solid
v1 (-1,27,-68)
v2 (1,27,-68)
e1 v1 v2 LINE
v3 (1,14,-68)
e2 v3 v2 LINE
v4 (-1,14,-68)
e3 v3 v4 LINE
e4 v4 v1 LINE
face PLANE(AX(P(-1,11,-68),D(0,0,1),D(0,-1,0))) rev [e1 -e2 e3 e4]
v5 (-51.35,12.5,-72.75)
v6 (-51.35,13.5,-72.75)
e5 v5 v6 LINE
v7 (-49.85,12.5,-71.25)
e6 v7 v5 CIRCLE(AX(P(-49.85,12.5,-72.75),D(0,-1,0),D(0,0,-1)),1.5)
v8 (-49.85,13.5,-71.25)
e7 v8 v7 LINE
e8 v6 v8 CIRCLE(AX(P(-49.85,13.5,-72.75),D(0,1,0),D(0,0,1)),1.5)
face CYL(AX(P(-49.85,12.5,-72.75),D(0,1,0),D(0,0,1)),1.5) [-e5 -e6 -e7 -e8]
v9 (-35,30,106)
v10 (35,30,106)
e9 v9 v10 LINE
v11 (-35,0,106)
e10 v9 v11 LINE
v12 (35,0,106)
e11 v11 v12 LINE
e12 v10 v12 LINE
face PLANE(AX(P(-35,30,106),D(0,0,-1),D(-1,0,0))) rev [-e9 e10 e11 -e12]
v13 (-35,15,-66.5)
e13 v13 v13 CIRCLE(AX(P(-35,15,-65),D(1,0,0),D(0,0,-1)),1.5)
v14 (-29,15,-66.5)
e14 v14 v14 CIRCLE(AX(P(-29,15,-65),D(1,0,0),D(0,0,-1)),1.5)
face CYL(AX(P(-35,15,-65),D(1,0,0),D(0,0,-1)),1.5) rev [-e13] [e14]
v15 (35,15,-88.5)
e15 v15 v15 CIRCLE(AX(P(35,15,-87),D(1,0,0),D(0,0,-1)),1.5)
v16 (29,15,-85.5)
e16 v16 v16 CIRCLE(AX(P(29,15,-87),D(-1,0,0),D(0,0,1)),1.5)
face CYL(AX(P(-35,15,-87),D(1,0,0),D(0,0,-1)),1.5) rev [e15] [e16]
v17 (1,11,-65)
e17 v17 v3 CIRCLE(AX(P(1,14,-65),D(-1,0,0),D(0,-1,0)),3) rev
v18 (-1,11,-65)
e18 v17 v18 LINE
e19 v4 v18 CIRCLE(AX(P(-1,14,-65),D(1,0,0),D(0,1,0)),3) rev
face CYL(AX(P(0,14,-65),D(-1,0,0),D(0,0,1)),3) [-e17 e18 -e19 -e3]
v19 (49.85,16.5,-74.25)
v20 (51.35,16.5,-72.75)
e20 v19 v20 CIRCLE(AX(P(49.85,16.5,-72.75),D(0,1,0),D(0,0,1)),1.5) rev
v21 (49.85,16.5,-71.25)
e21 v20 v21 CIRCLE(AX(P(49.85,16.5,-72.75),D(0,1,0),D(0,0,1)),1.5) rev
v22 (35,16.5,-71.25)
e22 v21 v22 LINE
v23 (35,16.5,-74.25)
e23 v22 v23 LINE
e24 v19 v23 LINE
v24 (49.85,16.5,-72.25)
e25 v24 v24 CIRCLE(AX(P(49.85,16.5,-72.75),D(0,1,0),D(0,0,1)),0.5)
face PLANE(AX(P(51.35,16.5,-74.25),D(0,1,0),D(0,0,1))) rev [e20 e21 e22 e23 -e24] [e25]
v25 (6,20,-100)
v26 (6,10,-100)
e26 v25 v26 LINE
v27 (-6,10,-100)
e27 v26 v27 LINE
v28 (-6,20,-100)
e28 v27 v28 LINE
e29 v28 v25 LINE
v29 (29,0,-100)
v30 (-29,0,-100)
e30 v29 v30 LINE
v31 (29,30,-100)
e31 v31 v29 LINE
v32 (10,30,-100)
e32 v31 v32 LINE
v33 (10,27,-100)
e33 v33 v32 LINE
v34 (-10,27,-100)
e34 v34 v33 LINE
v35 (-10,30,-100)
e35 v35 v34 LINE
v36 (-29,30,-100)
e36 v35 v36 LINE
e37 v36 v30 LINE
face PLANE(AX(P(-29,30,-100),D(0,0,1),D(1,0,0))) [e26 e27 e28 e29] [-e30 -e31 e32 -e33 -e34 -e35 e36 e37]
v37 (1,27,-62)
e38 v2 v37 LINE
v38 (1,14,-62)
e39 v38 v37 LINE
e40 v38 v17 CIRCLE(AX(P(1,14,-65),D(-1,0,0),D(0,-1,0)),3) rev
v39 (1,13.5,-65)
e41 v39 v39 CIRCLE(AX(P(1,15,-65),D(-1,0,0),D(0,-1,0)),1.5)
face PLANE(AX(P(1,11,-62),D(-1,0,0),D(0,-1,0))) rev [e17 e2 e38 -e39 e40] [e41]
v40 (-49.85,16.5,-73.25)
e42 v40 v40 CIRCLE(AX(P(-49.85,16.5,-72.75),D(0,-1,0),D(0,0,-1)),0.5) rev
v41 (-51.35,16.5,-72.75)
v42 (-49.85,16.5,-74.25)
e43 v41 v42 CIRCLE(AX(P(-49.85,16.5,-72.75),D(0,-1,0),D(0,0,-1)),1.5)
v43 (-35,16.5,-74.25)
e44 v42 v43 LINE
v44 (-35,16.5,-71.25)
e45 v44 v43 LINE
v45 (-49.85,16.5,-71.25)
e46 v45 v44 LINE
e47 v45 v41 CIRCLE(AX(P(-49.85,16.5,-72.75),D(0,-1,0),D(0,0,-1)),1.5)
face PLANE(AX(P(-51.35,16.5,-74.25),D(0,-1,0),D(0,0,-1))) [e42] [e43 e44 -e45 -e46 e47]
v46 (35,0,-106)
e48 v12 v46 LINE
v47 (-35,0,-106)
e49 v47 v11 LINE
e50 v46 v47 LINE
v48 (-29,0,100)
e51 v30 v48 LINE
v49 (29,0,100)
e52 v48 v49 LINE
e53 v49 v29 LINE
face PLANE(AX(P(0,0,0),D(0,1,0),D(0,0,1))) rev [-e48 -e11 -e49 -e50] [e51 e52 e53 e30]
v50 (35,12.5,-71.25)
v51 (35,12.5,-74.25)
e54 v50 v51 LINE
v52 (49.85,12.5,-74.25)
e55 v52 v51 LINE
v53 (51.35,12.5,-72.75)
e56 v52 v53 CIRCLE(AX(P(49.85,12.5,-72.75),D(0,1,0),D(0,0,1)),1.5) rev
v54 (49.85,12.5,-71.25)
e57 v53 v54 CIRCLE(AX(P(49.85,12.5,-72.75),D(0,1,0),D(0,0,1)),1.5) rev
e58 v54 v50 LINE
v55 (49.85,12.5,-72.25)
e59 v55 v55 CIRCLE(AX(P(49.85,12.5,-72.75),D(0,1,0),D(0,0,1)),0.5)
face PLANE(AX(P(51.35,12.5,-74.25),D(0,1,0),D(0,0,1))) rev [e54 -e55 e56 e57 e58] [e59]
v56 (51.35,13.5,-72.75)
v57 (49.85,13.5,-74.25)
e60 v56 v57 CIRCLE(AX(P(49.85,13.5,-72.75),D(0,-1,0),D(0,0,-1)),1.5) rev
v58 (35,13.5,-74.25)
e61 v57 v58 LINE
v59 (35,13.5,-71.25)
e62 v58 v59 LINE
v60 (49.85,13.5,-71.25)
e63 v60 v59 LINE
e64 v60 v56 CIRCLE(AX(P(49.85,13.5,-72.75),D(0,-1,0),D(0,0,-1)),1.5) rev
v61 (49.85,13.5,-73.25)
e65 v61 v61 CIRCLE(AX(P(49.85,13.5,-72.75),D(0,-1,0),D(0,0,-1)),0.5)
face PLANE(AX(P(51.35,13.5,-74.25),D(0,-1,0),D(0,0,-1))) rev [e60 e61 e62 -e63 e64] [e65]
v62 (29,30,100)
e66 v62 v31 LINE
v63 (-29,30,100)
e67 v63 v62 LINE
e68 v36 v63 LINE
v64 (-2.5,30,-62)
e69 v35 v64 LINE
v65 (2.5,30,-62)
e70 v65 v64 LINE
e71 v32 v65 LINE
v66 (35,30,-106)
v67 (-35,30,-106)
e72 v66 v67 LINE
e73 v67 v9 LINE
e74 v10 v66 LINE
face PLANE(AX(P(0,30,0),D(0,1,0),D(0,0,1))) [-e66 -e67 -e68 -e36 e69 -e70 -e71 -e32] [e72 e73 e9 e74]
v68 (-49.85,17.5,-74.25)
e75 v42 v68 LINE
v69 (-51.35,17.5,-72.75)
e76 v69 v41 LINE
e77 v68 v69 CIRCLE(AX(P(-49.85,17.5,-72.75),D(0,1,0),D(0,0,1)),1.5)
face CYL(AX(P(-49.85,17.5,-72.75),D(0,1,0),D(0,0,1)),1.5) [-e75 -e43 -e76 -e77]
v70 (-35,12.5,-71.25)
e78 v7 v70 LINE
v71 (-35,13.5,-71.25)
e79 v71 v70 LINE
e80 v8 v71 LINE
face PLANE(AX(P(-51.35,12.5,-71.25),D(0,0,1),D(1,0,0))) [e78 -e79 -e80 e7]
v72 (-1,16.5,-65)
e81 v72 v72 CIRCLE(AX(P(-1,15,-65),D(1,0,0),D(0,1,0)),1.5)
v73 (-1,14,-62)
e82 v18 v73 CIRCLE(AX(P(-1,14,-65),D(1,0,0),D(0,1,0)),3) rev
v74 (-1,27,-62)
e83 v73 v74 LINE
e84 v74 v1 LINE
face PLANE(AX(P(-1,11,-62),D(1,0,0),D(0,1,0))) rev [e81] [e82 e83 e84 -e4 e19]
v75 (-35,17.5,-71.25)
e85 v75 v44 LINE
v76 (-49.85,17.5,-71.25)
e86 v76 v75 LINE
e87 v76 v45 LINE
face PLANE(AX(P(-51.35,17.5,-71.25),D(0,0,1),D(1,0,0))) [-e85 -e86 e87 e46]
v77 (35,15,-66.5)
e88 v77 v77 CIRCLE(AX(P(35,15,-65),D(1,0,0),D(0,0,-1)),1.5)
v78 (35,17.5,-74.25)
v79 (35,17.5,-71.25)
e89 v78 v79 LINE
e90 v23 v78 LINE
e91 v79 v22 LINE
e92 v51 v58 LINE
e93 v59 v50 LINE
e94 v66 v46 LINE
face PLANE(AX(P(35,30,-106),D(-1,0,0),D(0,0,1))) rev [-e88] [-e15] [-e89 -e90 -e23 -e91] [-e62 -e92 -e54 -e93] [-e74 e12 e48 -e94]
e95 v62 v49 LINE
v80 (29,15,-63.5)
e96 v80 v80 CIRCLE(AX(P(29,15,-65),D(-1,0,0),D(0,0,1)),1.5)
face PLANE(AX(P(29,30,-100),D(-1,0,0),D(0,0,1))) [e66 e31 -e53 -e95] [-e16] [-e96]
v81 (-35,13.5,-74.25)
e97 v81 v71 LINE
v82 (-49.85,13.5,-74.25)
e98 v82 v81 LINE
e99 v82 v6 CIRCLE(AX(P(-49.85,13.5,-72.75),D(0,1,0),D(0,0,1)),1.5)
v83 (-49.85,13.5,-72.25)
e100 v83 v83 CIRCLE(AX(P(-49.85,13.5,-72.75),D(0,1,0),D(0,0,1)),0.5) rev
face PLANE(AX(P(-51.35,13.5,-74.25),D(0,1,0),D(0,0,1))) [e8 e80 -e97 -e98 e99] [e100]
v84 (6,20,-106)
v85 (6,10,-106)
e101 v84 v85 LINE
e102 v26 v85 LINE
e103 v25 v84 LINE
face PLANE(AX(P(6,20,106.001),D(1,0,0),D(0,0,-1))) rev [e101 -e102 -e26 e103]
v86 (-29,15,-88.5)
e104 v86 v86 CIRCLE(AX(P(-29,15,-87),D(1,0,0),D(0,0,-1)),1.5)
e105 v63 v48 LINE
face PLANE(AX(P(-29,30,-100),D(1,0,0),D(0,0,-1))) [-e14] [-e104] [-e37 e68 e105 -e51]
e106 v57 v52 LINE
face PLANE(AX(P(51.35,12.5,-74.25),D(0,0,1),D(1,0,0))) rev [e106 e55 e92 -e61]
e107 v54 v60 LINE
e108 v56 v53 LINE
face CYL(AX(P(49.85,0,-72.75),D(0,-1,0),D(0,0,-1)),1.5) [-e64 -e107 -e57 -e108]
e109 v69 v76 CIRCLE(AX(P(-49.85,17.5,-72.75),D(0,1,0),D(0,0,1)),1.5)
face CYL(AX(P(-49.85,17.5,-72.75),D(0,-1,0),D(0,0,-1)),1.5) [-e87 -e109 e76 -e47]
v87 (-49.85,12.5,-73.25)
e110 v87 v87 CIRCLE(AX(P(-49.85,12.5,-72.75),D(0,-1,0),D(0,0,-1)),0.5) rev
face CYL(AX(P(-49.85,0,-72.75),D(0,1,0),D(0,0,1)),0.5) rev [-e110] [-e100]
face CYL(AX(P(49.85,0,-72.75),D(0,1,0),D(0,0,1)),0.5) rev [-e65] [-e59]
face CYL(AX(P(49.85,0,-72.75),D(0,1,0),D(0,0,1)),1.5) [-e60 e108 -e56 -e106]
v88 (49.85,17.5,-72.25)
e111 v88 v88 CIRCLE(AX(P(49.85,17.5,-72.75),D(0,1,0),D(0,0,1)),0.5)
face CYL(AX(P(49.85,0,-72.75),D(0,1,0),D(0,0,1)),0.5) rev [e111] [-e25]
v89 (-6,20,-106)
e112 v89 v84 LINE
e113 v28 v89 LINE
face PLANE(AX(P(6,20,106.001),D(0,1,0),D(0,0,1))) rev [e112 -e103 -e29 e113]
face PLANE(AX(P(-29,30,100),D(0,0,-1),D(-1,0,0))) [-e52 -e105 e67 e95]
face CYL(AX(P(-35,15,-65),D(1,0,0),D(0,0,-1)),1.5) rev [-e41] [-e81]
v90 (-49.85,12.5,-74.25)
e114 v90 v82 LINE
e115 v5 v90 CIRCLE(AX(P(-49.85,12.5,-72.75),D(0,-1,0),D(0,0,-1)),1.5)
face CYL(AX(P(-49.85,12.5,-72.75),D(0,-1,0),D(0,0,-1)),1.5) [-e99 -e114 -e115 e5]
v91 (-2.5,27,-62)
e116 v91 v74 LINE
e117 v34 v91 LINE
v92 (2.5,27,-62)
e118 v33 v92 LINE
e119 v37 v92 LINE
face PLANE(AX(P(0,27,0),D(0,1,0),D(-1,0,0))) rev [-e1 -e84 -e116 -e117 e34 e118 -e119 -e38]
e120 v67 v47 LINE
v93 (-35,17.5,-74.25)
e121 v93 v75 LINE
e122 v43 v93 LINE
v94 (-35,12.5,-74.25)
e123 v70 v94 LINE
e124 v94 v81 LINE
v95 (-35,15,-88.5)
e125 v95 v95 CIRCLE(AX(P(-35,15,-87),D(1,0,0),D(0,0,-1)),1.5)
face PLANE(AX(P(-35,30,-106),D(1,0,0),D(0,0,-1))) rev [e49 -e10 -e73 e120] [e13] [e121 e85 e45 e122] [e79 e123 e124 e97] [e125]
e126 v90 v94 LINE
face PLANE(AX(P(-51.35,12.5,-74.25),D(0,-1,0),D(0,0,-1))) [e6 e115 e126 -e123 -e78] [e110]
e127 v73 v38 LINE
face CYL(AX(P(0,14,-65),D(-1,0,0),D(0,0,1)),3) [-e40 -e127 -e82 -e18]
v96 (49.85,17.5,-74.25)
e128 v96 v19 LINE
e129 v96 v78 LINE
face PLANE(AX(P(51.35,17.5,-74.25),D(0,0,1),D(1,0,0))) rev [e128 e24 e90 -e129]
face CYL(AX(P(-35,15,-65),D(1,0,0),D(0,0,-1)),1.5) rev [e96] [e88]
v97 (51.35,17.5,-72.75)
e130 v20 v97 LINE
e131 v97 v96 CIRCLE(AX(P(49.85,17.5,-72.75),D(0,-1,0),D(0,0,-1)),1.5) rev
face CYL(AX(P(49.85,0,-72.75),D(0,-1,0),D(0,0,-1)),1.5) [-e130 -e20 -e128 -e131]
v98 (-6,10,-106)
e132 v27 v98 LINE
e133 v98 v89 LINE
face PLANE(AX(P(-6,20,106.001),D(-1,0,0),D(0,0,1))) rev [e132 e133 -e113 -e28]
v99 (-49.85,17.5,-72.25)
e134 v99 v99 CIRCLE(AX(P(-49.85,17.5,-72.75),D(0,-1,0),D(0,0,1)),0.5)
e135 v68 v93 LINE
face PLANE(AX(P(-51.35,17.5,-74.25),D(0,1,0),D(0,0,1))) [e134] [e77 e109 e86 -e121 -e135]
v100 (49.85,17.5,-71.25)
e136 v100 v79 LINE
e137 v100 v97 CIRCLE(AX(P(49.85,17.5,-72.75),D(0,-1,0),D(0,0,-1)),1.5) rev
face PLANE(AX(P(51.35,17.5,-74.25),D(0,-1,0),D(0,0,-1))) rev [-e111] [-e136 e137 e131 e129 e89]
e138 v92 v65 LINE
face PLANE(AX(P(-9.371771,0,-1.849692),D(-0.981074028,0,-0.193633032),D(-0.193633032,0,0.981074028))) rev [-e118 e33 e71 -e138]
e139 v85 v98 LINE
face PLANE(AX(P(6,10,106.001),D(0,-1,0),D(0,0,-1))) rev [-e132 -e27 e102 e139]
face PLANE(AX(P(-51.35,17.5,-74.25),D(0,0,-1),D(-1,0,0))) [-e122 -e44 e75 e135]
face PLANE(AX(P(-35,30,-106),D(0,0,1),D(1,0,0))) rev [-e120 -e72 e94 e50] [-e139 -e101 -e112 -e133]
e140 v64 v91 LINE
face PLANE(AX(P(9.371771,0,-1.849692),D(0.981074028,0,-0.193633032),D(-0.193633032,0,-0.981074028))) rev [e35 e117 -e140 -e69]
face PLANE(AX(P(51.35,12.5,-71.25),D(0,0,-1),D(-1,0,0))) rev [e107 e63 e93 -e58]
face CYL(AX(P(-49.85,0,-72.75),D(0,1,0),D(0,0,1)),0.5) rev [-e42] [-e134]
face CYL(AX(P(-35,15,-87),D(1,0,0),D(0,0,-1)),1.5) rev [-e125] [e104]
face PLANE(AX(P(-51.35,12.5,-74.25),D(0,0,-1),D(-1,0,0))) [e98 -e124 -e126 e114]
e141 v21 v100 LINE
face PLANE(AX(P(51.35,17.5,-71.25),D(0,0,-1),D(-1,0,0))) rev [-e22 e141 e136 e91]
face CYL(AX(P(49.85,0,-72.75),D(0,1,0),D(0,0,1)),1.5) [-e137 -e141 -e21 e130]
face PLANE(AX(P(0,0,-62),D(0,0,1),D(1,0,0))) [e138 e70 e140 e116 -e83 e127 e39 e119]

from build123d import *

# Parameters (mm, degrees)
SKETCH1_W            = 70
SKETCH1_H            = 212
SKETCH1_W_2          = 58
SKETCH1_H_2          = 200
BOSS_EXTRUDE1_DEPTH  = 30
SKETCH10_W           = 2
SKETCH10_H           = 6
BOSS_EXTRUDE3_DEPTH  = 16
FILLET2_R            = 3
SKETCH2_R            = 1.5
CUT_EXTRUDE1_DEPTH   = 131.52202895
CUT_EXTRUDE2_REACH   = 218.954
SKETCH3_W            = 12
SKETCH3_H            = 10
SKETCH4_W            = 3
SKETCH4_H            = 1
BOSS_EXTRUDE2_DEPTH  = 16.35
FILLET1_R            = 1.5
SKETCH6_R            = 0.5
CUT_EXTRUDE4_DEPTH   = 120.075910751
FILLET1_OF_MIRROR2_R = 1.5


with BuildPart() as part:
    # Sketch1 → Boss-Extrude1 (new body)
    with BuildSketch(Plane(origin=(0, 0, 0), x_dir=(1, 0, 0), z_dir=(0, 1, 0))):
        Rectangle(SKETCH1_W, SKETCH1_H)
        Rectangle(SKETCH1_W_2, SKETCH1_H_2, mode=Mode.SUBTRACT)
    extrude(amount=BOSS_EXTRUDE1_DEPTH)

    # Sketch7 → Loft3 section 0
    with BuildSketch(Plane.XY.offset(-100)):
        with BuildLine():
            Line((-10, 30), (10, 30))
            Line((10, 30), (10, 27))
            Line((10, 27), (-10, 27))
            Line((-10, 27), (-10, 30))
        make_face()
    # Sketch8 → Loft3 section 1
    with BuildSketch(Plane.XY.offset(-62)):
        with BuildLine():
            Line((-2.5, 30), (2.5, 30))
            Line((2.5, 30), (2.5, 27))
            Line((2.5, 27), (-2.5, 27))
            Line((-2.5, 27), (-2.5, 30))
        make_face()
    loft()

    # Sketch10 → Boss-Extrude3 (add)
    with BuildSketch(Plane.XZ.offset(-27)):
        with Locations((0, -65)):
            Rectangle(SKETCH10_W, SKETCH10_H)
    extrude(amount=BOSS_EXTRUDE3_DEPTH)

    # Fillet2
    fillet2_edges = [part.edges().sort_by_distance(p)[0] for p in [
        (0, 11, -68),
        (0, 11, -62),
    ]]
    fillet(fillet2_edges, radius=FILLET2_R - 0.0001)  # a hair under: the kernel refuses the full size

    # Sketch2 → Cut-Extrude1 (cut, through all)
    with BuildSketch(Plane(origin=(35, 0, 0), x_dir=(0, 0, -1), z_dir=(1, 0, 0))):
        with Locations(Location((65, 15, 0), (0, 0, 270))):
            Circle(SKETCH2_R)
        with Locations((87, 15)):
            Circle(SKETCH2_R)
    extrude(amount=-CUT_EXTRUDE1_DEPTH, mode=Mode.SUBTRACT)

    # Sketch3 → Cut-Extrude2 (cut, up to next)
    with BuildSketch(Plane(origin=(0, 0, -106), x_dir=(-1, 0, 0), z_dir=(0, 0, -1)), mode=Mode.PRIVATE) as cut_extrude2_sk1:
        with Locations((0, 15)):
            Rectangle(SKETCH3_W, SKETCH3_H)
    cut_extrude2_tool1 = extrude(cut_extrude2_sk1.sketch, amount=-CUT_EXTRUDE2_REACH, mode=Mode.PRIVATE) & part.part
    add(cut_extrude2_tool1.solids().sort_by_distance((0, 15, -106))[0], mode=Mode.SUBTRACT)

    # Sketch4 → Boss-Extrude2 (add)
    with BuildSketch(Plane(origin=(35, 0, 0), x_dir=(0, 0, -1), z_dir=(1, 0, 0))):
        with Locations((72.75, 13)):
            Rectangle(SKETCH4_W, SKETCH4_H)
        with Locations((72.75, 17)):
            Rectangle(SKETCH4_W, SKETCH4_H)
    boss_extrude2 = extrude(amount=BOSS_EXTRUDE2_DEPTH)

    # Fillet1
    fillet1_edges = [part.edges().sort_by_distance(p)[0] for p in [
        (51.35, 13, -74.25),
        (51.35, 13, -71.25),
        (51.35, 17, -71.25),
        (51.35, 17, -74.25),
    ]]
    fillet(fillet1_edges, radius=FILLET1_R - 0.0001)  # a hair under: the kernel refuses the full size

    # Sketch6 → Cut-Extrude4 (cut, through all)
    with BuildSketch(Plane(origin=(0, 17.5, 0), x_dir=(1, 0, 0), z_dir=(0, 1, 0))):
        with Locations(Location((49.85, 72.75, 0), (0, 0, 270))):
            Circle(SKETCH6_R)
    cut_extrude4 = extrude(amount=-CUT_EXTRUDE4_DEPTH, mode=Mode.SUBTRACT)

    # Mirror2: Boss-Extrude2, Cut-Extrude4 across plane
    add(boss_extrude2.mirror(Plane(origin=(0, 0, 0), x_dir=(0, 0, 1), z_dir=(1, 0, 0))))
    add(cut_extrude4.mirror(Plane(origin=(0, 0, 0), x_dir=(0, 0, 1), z_dir=(1, 0, 0))), mode=Mode.SUBTRACT)

    # Fillet1 of Mirror2
    fillet1_of_mirror2_edges = [part.edges().sort_by_distance(p)[0] for p in [
        (-51.35, 13, -74.25),
        (-51.35, 13, -71.25),
        (-51.35, 17, -71.25),
        (-51.35, 17, -74.25),
    ]]
    fillet(fillet1_of_mirror2_edges, radius=FILLET1_OF_MIRROR2_R - 0.0001)  # a hair under: the kernel refuses the full size


solid = part.part
